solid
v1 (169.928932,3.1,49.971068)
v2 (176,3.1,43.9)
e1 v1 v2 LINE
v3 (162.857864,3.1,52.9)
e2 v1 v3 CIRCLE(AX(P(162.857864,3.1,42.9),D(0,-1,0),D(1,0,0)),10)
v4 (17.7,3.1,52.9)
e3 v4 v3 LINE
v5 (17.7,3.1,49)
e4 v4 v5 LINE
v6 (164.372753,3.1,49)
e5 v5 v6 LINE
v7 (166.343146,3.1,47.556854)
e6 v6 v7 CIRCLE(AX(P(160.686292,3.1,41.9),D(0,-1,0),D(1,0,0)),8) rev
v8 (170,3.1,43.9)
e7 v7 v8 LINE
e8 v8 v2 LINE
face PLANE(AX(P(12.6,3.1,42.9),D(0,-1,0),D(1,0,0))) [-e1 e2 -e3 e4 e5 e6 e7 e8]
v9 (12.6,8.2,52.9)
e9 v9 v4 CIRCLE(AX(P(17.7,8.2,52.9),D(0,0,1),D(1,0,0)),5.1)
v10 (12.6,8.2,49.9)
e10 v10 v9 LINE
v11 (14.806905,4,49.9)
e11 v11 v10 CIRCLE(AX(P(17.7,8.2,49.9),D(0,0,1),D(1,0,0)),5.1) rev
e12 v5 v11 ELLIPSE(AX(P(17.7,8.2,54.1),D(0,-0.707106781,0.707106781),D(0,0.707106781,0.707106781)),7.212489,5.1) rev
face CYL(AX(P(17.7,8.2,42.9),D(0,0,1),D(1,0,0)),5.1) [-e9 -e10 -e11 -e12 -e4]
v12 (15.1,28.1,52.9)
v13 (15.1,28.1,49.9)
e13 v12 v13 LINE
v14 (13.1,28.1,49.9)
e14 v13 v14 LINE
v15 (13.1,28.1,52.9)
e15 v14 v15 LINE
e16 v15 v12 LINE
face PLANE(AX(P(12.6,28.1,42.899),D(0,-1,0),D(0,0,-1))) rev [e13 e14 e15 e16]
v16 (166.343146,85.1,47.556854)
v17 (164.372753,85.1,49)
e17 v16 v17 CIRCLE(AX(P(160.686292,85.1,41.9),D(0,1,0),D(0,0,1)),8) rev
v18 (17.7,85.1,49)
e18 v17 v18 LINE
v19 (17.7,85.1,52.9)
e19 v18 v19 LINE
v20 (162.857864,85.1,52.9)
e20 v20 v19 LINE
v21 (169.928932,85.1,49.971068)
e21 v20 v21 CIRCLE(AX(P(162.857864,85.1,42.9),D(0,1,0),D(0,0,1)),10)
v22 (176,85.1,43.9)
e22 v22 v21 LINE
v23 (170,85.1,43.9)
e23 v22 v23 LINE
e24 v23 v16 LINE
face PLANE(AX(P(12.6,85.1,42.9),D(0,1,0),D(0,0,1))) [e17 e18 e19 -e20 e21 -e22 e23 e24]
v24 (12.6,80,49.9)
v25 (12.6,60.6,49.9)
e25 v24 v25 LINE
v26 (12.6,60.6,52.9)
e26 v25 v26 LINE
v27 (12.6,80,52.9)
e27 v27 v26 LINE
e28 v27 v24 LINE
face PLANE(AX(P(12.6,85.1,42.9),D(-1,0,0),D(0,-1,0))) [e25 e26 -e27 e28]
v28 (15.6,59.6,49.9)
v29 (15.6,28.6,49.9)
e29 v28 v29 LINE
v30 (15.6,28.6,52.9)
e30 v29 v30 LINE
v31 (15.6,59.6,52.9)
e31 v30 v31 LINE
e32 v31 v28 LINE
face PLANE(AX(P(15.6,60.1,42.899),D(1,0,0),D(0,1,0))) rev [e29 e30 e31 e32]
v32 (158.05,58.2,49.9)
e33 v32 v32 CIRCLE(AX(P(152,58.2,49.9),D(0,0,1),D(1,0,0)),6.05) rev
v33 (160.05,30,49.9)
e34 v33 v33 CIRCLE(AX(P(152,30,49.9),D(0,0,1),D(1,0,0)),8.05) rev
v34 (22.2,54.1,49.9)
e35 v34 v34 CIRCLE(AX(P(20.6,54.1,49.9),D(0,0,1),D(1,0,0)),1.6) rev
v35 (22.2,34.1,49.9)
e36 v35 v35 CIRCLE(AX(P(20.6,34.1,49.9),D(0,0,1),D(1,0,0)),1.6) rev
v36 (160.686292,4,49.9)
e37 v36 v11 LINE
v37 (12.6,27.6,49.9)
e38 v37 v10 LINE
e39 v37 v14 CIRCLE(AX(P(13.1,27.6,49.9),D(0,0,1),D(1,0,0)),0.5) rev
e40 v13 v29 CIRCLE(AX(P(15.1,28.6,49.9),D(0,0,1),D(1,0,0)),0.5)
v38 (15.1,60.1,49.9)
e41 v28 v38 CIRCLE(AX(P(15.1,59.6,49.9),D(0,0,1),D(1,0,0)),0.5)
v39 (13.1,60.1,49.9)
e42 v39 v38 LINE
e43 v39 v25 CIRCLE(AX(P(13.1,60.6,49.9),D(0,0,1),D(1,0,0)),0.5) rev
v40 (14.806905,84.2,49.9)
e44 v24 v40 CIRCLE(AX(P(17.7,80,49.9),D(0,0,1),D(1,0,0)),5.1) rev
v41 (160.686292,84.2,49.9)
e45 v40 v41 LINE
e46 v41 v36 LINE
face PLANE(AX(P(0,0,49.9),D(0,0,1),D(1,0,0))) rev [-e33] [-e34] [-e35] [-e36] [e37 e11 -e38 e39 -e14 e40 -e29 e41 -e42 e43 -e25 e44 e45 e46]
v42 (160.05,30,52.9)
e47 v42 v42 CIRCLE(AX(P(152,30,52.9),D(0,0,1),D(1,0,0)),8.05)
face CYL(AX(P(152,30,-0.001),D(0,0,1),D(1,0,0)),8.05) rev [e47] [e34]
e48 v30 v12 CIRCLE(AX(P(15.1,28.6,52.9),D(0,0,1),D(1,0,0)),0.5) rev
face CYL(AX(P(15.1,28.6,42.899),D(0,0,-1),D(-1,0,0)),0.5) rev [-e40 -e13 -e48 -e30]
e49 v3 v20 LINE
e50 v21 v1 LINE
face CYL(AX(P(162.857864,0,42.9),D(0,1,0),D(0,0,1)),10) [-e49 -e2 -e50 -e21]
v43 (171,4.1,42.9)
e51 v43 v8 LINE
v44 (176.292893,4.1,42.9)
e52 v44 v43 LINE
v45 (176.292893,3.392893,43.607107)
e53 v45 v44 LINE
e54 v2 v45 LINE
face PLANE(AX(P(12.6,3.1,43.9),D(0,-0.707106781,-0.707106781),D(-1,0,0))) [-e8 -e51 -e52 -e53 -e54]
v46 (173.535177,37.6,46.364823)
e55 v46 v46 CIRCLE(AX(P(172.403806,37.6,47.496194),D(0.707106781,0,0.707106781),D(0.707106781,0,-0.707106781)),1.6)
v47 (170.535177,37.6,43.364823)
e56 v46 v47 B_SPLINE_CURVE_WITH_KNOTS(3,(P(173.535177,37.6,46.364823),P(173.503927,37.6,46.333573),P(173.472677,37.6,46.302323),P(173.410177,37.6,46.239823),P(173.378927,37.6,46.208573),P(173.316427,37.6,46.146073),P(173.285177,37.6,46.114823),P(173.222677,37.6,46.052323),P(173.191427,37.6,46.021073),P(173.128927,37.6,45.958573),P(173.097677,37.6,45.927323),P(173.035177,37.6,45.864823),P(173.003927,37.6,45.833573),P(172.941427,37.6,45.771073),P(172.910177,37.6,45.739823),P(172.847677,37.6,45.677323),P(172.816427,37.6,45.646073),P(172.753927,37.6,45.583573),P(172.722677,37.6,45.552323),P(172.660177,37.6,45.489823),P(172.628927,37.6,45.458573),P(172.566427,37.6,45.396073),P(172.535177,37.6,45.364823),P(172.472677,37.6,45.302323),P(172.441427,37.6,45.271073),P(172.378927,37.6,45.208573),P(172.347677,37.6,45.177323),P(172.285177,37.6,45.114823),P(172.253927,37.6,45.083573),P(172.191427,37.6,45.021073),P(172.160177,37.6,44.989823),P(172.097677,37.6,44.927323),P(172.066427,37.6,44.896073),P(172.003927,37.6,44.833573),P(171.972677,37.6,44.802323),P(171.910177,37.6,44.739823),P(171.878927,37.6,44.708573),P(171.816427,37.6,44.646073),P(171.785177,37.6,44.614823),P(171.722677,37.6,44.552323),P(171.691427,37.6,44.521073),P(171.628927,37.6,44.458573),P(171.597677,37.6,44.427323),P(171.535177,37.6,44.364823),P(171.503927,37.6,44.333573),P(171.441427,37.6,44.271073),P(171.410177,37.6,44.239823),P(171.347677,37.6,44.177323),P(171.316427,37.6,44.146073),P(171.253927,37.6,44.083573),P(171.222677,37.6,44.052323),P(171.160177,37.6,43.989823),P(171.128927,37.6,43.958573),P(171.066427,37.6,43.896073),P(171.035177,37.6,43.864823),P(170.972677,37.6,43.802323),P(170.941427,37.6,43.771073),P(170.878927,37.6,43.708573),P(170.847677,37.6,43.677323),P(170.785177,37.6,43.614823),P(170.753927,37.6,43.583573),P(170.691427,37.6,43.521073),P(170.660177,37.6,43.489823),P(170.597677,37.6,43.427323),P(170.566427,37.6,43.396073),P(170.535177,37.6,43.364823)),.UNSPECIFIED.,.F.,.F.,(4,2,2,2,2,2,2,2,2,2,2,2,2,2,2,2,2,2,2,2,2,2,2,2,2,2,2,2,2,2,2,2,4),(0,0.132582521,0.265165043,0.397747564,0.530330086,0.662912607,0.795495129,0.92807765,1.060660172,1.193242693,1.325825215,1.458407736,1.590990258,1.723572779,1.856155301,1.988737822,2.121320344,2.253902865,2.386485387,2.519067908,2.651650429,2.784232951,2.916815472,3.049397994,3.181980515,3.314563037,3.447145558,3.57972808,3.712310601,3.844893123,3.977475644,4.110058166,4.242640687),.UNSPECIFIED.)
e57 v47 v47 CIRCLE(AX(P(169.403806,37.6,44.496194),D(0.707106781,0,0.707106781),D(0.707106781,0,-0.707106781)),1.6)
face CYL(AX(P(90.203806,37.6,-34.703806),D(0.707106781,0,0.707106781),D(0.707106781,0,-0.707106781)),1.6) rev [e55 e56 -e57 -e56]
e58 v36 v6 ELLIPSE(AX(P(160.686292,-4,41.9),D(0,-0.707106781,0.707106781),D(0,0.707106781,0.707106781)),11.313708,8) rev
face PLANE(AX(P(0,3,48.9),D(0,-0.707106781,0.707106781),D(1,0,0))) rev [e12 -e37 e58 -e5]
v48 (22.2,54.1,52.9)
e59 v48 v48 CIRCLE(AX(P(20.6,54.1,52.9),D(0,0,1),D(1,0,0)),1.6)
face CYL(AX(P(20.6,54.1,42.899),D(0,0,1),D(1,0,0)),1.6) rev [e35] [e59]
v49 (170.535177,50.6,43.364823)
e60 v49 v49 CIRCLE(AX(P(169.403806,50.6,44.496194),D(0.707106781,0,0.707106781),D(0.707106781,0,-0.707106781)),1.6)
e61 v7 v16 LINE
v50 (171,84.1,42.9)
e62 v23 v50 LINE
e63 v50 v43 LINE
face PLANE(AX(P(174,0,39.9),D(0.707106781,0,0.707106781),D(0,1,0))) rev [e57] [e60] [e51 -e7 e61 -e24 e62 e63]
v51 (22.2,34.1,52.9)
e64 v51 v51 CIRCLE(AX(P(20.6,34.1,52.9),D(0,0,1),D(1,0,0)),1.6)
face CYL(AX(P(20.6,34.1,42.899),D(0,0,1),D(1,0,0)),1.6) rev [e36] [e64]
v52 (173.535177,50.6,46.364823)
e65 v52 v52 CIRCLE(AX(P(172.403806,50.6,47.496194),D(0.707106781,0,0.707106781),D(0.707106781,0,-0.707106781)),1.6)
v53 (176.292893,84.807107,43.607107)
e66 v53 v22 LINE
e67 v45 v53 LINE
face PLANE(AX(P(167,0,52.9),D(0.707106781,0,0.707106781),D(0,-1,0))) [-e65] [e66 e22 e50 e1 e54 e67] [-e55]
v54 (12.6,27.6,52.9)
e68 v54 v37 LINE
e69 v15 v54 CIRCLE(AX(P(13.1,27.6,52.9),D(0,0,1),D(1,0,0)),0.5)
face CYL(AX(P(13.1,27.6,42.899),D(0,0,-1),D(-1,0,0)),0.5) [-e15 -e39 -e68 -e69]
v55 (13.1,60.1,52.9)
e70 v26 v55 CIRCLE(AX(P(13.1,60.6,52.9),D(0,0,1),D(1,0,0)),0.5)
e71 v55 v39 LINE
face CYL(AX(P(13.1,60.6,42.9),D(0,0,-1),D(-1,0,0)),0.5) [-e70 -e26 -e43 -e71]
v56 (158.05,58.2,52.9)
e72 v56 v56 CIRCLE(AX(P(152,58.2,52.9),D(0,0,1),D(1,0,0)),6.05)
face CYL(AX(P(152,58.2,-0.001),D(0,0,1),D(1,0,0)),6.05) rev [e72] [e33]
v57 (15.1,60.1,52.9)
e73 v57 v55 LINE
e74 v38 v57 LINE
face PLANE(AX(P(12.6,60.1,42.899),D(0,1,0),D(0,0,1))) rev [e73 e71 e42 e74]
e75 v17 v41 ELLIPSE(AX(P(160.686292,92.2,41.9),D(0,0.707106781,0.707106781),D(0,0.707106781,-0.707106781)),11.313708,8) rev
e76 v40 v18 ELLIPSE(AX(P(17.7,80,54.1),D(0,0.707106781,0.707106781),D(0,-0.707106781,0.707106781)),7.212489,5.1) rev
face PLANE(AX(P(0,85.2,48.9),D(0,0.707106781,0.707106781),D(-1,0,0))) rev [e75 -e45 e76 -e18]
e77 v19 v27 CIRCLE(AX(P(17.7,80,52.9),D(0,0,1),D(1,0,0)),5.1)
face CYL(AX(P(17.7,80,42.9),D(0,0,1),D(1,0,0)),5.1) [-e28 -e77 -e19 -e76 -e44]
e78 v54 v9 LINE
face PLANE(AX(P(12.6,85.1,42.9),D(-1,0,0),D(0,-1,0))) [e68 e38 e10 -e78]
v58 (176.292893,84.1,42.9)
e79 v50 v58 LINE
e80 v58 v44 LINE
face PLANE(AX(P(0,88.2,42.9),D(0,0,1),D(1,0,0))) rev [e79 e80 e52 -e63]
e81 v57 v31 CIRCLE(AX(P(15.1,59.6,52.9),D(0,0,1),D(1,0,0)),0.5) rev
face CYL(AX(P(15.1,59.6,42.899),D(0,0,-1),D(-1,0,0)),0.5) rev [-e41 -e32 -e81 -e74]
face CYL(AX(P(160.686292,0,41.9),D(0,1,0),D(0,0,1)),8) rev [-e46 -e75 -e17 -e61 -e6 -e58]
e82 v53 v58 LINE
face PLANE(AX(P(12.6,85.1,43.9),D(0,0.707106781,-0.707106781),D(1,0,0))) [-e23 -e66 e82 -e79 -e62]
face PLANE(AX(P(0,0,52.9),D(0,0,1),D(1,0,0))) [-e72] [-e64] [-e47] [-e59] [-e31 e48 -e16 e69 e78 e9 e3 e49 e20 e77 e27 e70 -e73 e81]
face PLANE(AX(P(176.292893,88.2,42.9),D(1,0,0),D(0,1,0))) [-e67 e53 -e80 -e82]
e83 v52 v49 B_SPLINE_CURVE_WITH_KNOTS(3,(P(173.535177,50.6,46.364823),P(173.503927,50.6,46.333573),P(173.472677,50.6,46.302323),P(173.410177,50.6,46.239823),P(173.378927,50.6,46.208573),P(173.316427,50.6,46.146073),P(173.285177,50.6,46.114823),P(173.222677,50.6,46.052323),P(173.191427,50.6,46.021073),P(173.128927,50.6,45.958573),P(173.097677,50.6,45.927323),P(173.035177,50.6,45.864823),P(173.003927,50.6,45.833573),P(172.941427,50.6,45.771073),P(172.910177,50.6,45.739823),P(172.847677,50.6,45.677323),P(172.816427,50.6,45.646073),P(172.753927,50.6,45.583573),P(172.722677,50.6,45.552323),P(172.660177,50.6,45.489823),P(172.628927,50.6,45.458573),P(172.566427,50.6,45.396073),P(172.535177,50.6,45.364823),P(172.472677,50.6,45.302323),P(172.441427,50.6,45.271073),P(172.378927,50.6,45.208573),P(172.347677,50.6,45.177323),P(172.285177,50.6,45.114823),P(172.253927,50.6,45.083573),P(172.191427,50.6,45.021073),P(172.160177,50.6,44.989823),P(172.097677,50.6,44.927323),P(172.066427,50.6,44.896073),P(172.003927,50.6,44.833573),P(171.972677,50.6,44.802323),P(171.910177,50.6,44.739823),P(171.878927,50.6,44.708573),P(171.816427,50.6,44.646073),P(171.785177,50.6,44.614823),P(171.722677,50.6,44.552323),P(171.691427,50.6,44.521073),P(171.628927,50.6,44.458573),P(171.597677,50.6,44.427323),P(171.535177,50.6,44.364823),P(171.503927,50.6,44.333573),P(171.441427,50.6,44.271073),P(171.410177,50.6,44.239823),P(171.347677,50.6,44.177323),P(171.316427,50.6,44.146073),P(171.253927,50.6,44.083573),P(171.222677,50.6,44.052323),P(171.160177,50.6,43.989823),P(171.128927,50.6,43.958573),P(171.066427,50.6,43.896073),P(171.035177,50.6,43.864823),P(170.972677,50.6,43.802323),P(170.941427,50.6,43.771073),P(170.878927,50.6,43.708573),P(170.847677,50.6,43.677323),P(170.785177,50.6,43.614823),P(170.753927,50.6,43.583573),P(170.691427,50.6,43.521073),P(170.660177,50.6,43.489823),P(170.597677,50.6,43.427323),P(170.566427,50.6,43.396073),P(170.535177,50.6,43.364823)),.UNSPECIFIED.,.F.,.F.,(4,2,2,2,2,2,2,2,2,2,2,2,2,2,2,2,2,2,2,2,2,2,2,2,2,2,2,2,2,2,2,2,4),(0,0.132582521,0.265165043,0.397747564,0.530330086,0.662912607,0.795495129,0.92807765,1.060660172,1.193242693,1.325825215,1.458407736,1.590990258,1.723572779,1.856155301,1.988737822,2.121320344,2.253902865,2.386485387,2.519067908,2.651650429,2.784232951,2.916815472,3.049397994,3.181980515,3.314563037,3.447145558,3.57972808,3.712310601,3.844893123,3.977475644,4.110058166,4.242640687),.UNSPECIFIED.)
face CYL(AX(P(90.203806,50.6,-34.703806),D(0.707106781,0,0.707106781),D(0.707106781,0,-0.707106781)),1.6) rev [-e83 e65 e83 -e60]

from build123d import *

# Parameters (mm, degrees)
SKETCH_1_W            = 88.2
SKETCH_1_H            = 177
EXTRUDE_1_DEPTH       = 52.9
SHELL_1_T             = -3
CUT_EXTRUDE_5_REACH   = 206.711
SKETCH_16_R           = 6.05
SKETCH_16_R_2         = 8.05
CHAMFER_7_SIZE        = 10
CHAMFER_8_SIZE        = 1
SKETCH_21_W           = 10.5
SKETCH_21_H           = 82.2
EXTRUDE_7_DEPTH       = 6
SKETCH_22_OUTSIDE_W   = 219.942
SKETCH_22_OUTSIDE_H   = 131.142
SKETCH_22_OUTSIDE_W_2 = 164.4
SKETCH_22_OUTSIDE_H_2 = 82
CUT_EXTRUDE_8_DEPTH   = 10
SKETCH_23_W           = 177
SKETCH_23_H           = 42.9
CUT_EXTRUDE_9_DEPTH   = 205.711137948
FILLET_3_R            = 10
FILLET_4_R            = 5.1
SKETCH_24_R           = 1.6
CUT_EXTRUDE_10_DEPTH  = 146.652789194
CHAMFER_10_SIZE       = 1
CHAMFER_10_SIZE_2     = 0.707106781
CUT_EXTRUDE_11_REACH  = 198.013
SKETCH_25_R           = 1.6
FILLET_5_R            = 8
CUT_EXTRUDE_12_REACH  = 198.013
SKETCH_26_W           = 3
SKETCH_26_H           = 32
FILLET_6_R            = 0.5


with BuildPart() as part:
    # 草图1 → 凸台-拉伸1 (new body)
    with BuildSketch(Plane(origin=(0, 0, 0), x_dir=(0, 1, 0), z_dir=(0, 0, 1))):
        with Locations((44.1, -88.5)):
            Rectangle(SKETCH_1_W, SKETCH_1_H)
    extrude(amount=EXTRUDE_1_DEPTH)

    # 抽壳1
    shell_1_openings = [part.faces().sort_by_distance(p)[0] for p in [
        (88.5, 44.1, 0),
    ]]
    offset(amount=SHELL_1_T, openings=shell_1_openings, kind=Kind.INTERSECTION)

    # 草图16 → 切除-拉伸5 (cut, up to next)
    with BuildSketch(Plane.XY.offset(52.9), mode=Mode.PRIVATE) as cut_extrude_5_sk1:
        with Locations((152, 58.2)):
            Circle(SKETCH_16_R)
    cut_extrude_5_tool1 = extrude(cut_extrude_5_sk1.sketch, amount=-CUT_EXTRUDE_5_REACH, mode=Mode.PRIVATE) & part.part
    # 草图16 → 切除-拉伸5 (cut, up to next)
    with BuildSketch(Plane.XY.offset(52.9), mode=Mode.PRIVATE) as cut_extrude_5_sk2:
        with Locations((152, 30)):
            Circle(SKETCH_16_R_2)
    cut_extrude_5_tool2 = extrude(cut_extrude_5_sk2.sketch, amount=-CUT_EXTRUDE_5_REACH, mode=Mode.PRIVATE) & part.part
    add(cut_extrude_5_tool1.solids().sort_by_distance((152, 58.2, 52.9))[0], mode=Mode.SUBTRACT)
    add(cut_extrude_5_tool2.solids().sort_by_distance((152, 30, 52.9))[0], mode=Mode.SUBTRACT)

    # 倒角7
    chamfer_7_edges = [part.edges().sort_by_distance(p)[0] for p in [
        (174, 44.1, 49.9),
        (177, 44.1, 52.9),
    ]]
    chamfer(chamfer_7_edges, length=CHAMFER_7_SIZE)

    # 倒角8
    chamfer_8_edges = [part.edges().sort_by_distance(p)[0] for p in [
        (83.5, 3, 49.9),
        (83.5, 88.2, 52.9),
        (177, 88.2, 21.45),
        (172, 88.2, 47.9),
        (177, 0, 21.45),
        (172, 0, 47.9),
        (83.5, 85.2, 49.9),
        (83.5, 0, 52.9),
    ]]
    chamfer(chamfer_8_edges, length=CHAMFER_8_SIZE)

    # 草图21 → 凸台-拉伸7 (add)
    with BuildSketch(Plane(origin=(0, 0, 0), x_dir=(-1, 0, 0), z_dir=(0, 0, -1))):
        with Locations((-168.75, 44.1)):
            Rectangle(SKETCH_21_W, SKETCH_21_H)
        with Locations((-8.25, 44.1)):
            Rectangle(SKETCH_21_W, SKETCH_21_H)
    extrude(amount=-EXTRUDE_7_DEPTH)

    # 草图22 outside → 切除-拉伸8 (cut)
    with BuildSketch(Plane.XY.offset(52.9)):
        with Locations((88.5, 44.1)):
            Rectangle(SKETCH_22_OUTSIDE_W, SKETCH_22_OUTSIDE_H)
        with Locations((94.8, 44.1)):
            Rectangle(SKETCH_22_OUTSIDE_W_2, SKETCH_22_OUTSIDE_H_2, mode=Mode.SUBTRACT)
    extrude(amount=-CUT_EXTRUDE_8_DEPTH, mode=Mode.SUBTRACT)

    # 草图23 → 切除-拉伸9 (cut, through all)
    with BuildSketch(Plane.XZ):
        with Locations((88.5, 21.45)):
            Rectangle(SKETCH_23_W, SKETCH_23_H)
    extrude(amount=-CUT_EXTRUDE_9_DEPTH, mode=Mode.SUBTRACT)

    # 圆角3
    fillet_3_edges = [part.edges().sort_by_distance(p)[0] for p in [
        (167, 44.1, 52.9),
    ]]
    fillet(fillet_3_edges, radius=FILLET_3_R)

    # 圆角4
    fillet_4_edges = [part.edges().sort_by_distance(p)[0] for p in [
        (12.6, 3.1, 50.95),
        (12.6, 85.1, 50.95),
    ]]
    fillet(fillet_4_edges, radius=FILLET_4_R)

    # 草图24 → 切除-拉伸10 (cut, through all)
    with BuildSketch(Plane(origin=(109.95, 0, 109.95), x_dir=(0.7071067811865456, 0, -0.7071067811865495), z_dir=(0.7071067811865495, 0, 0.7071067811865456))):
        with Locations((88.323019357, 50.6)):
            Circle(SKETCH_24_R)
        with Locations((88.323019357, 37.6)):
            Circle(SKETCH_24_R)
    extrude(amount=-CUT_EXTRUDE_10_DEPTH, mode=Mode.SUBTRACT)

    # 倒角10
    # the kernel refuses this chamfer: 1, 0.707106781 mm, written as the material it takes off along each edge
    with BuildSketch(Plane(origin=(177, 87.671682988, 42.9), x_dir=(-0.6873969152646486, 0, 0.7262819568766976), z_dir=(0, -1, 0))) as chamfer_10_piece_1:
        Polygon((CHAMFER_10_SIZE * 0.999621916911, CHAMFER_10_SIZE * 0.0274958766106), (CHAMFER_10_SIZE_2 * 0.687396915446, CHAMFER_10_SIZE_2 * 0.726281957068), (0, 0), align=None)
    extrude(amount=87.143365976, mode=Mode.SUBTRACT)
    with BuildSketch(Plane(origin=(179.571682988, 3.1, 42.9), x_dir=(0, -0.027495876610586414, 0.9996219169112968), z_dir=(-1, 0, 0))) as chamfer_10_piece_2:
        Polygon((CHAMFER_10_SIZE * 0.999621916911, CHAMFER_10_SIZE * 0.0274958766106), (-CHAMFER_10_SIZE * 0.0274958766106, CHAMFER_10_SIZE * 0.999621916911), (0, 0), align=None)
    extrude(amount=11.143365976, mode=Mode.SUBTRACT)
    with BuildSketch(Plane(origin=(168.428317012, 85.1, 42.9), x_dir=(0, -0.9996219169112968, -0.027495876610589196), z_dir=(1, 0, 0))) as chamfer_10_piece_3:
        Polygon((CHAMFER_10_SIZE * 0.999621916911, -CHAMFER_10_SIZE * 0.0274958766106), (-CHAMFER_10_SIZE * 0.0274958766106, -CHAMFER_10_SIZE * 0.999621916911), (0, 0), align=None)
    extrude(amount=11.143365976, mode=Mode.SUBTRACT)

    # 草图25 → 切除-拉伸11 (cut, up to next)
    with BuildSketch(Plane.XY.offset(52.9), mode=Mode.PRIVATE) as cut_extrude_11_sk1:
        with Locations((20.6, 54.1)):
            Circle(SKETCH_25_R)
    cut_extrude_11_tool1 = extrude(cut_extrude_11_sk1.sketch, amount=-CUT_EXTRUDE_11_REACH, mode=Mode.PRIVATE) & part.part
    # 草图25 → 切除-拉伸11 (cut, up to next)
    with BuildSketch(Plane.XY.offset(52.9), mode=Mode.PRIVATE) as cut_extrude_11_sk2:
        with Locations((20.6, 34.1)):
            Circle(SKETCH_25_R)
    cut_extrude_11_tool2 = extrude(cut_extrude_11_sk2.sketch, amount=-CUT_EXTRUDE_11_REACH, mode=Mode.PRIVATE) & part.part
    add(cut_extrude_11_tool1.solids().sort_by_distance((20.6, 54.1, 52.9))[0], mode=Mode.SUBTRACT)
    add(cut_extrude_11_tool2.solids().sort_by_distance((20.6, 34.1, 52.9))[0], mode=Mode.SUBTRACT)

    # 圆角5
    fillet_5_edges = [part.edges().sort_by_distance(p)[0] for p in [
        (164, 44.1, 49.9),
    ]]
    fillet(fillet_5_edges, radius=FILLET_5_R)

    # 草图26 → 切除-拉伸12 (cut, up to next)
    with BuildSketch(Plane.XY.offset(52.9), mode=Mode.PRIVATE) as cut_extrude_12_sk1:
        with Locations((14.1, 44.1)):
            Rectangle(SKETCH_26_W, SKETCH_26_H)
    cut_extrude_12_tool1 = extrude(cut_extrude_12_sk1.sketch, amount=-CUT_EXTRUDE_12_REACH, mode=Mode.PRIVATE) & part.part
    add(cut_extrude_12_tool1.solids().sort_by_distance((14.1, 44.1, 52.9))[0], mode=Mode.SUBTRACT)

    # 圆角6
    fillet_6_edges = [part.edges().sort_by_distance(p)[0] for p in [
        (12.6, 28.1, 51.4),
        (12.6, 60.1, 51.4),
        (15.6, 60.1, 51.4),
        (15.6, 28.1, 51.4),
    ]]
    fillet(fillet_6_edges, radius=FILLET_6_R)


solid = part.part
